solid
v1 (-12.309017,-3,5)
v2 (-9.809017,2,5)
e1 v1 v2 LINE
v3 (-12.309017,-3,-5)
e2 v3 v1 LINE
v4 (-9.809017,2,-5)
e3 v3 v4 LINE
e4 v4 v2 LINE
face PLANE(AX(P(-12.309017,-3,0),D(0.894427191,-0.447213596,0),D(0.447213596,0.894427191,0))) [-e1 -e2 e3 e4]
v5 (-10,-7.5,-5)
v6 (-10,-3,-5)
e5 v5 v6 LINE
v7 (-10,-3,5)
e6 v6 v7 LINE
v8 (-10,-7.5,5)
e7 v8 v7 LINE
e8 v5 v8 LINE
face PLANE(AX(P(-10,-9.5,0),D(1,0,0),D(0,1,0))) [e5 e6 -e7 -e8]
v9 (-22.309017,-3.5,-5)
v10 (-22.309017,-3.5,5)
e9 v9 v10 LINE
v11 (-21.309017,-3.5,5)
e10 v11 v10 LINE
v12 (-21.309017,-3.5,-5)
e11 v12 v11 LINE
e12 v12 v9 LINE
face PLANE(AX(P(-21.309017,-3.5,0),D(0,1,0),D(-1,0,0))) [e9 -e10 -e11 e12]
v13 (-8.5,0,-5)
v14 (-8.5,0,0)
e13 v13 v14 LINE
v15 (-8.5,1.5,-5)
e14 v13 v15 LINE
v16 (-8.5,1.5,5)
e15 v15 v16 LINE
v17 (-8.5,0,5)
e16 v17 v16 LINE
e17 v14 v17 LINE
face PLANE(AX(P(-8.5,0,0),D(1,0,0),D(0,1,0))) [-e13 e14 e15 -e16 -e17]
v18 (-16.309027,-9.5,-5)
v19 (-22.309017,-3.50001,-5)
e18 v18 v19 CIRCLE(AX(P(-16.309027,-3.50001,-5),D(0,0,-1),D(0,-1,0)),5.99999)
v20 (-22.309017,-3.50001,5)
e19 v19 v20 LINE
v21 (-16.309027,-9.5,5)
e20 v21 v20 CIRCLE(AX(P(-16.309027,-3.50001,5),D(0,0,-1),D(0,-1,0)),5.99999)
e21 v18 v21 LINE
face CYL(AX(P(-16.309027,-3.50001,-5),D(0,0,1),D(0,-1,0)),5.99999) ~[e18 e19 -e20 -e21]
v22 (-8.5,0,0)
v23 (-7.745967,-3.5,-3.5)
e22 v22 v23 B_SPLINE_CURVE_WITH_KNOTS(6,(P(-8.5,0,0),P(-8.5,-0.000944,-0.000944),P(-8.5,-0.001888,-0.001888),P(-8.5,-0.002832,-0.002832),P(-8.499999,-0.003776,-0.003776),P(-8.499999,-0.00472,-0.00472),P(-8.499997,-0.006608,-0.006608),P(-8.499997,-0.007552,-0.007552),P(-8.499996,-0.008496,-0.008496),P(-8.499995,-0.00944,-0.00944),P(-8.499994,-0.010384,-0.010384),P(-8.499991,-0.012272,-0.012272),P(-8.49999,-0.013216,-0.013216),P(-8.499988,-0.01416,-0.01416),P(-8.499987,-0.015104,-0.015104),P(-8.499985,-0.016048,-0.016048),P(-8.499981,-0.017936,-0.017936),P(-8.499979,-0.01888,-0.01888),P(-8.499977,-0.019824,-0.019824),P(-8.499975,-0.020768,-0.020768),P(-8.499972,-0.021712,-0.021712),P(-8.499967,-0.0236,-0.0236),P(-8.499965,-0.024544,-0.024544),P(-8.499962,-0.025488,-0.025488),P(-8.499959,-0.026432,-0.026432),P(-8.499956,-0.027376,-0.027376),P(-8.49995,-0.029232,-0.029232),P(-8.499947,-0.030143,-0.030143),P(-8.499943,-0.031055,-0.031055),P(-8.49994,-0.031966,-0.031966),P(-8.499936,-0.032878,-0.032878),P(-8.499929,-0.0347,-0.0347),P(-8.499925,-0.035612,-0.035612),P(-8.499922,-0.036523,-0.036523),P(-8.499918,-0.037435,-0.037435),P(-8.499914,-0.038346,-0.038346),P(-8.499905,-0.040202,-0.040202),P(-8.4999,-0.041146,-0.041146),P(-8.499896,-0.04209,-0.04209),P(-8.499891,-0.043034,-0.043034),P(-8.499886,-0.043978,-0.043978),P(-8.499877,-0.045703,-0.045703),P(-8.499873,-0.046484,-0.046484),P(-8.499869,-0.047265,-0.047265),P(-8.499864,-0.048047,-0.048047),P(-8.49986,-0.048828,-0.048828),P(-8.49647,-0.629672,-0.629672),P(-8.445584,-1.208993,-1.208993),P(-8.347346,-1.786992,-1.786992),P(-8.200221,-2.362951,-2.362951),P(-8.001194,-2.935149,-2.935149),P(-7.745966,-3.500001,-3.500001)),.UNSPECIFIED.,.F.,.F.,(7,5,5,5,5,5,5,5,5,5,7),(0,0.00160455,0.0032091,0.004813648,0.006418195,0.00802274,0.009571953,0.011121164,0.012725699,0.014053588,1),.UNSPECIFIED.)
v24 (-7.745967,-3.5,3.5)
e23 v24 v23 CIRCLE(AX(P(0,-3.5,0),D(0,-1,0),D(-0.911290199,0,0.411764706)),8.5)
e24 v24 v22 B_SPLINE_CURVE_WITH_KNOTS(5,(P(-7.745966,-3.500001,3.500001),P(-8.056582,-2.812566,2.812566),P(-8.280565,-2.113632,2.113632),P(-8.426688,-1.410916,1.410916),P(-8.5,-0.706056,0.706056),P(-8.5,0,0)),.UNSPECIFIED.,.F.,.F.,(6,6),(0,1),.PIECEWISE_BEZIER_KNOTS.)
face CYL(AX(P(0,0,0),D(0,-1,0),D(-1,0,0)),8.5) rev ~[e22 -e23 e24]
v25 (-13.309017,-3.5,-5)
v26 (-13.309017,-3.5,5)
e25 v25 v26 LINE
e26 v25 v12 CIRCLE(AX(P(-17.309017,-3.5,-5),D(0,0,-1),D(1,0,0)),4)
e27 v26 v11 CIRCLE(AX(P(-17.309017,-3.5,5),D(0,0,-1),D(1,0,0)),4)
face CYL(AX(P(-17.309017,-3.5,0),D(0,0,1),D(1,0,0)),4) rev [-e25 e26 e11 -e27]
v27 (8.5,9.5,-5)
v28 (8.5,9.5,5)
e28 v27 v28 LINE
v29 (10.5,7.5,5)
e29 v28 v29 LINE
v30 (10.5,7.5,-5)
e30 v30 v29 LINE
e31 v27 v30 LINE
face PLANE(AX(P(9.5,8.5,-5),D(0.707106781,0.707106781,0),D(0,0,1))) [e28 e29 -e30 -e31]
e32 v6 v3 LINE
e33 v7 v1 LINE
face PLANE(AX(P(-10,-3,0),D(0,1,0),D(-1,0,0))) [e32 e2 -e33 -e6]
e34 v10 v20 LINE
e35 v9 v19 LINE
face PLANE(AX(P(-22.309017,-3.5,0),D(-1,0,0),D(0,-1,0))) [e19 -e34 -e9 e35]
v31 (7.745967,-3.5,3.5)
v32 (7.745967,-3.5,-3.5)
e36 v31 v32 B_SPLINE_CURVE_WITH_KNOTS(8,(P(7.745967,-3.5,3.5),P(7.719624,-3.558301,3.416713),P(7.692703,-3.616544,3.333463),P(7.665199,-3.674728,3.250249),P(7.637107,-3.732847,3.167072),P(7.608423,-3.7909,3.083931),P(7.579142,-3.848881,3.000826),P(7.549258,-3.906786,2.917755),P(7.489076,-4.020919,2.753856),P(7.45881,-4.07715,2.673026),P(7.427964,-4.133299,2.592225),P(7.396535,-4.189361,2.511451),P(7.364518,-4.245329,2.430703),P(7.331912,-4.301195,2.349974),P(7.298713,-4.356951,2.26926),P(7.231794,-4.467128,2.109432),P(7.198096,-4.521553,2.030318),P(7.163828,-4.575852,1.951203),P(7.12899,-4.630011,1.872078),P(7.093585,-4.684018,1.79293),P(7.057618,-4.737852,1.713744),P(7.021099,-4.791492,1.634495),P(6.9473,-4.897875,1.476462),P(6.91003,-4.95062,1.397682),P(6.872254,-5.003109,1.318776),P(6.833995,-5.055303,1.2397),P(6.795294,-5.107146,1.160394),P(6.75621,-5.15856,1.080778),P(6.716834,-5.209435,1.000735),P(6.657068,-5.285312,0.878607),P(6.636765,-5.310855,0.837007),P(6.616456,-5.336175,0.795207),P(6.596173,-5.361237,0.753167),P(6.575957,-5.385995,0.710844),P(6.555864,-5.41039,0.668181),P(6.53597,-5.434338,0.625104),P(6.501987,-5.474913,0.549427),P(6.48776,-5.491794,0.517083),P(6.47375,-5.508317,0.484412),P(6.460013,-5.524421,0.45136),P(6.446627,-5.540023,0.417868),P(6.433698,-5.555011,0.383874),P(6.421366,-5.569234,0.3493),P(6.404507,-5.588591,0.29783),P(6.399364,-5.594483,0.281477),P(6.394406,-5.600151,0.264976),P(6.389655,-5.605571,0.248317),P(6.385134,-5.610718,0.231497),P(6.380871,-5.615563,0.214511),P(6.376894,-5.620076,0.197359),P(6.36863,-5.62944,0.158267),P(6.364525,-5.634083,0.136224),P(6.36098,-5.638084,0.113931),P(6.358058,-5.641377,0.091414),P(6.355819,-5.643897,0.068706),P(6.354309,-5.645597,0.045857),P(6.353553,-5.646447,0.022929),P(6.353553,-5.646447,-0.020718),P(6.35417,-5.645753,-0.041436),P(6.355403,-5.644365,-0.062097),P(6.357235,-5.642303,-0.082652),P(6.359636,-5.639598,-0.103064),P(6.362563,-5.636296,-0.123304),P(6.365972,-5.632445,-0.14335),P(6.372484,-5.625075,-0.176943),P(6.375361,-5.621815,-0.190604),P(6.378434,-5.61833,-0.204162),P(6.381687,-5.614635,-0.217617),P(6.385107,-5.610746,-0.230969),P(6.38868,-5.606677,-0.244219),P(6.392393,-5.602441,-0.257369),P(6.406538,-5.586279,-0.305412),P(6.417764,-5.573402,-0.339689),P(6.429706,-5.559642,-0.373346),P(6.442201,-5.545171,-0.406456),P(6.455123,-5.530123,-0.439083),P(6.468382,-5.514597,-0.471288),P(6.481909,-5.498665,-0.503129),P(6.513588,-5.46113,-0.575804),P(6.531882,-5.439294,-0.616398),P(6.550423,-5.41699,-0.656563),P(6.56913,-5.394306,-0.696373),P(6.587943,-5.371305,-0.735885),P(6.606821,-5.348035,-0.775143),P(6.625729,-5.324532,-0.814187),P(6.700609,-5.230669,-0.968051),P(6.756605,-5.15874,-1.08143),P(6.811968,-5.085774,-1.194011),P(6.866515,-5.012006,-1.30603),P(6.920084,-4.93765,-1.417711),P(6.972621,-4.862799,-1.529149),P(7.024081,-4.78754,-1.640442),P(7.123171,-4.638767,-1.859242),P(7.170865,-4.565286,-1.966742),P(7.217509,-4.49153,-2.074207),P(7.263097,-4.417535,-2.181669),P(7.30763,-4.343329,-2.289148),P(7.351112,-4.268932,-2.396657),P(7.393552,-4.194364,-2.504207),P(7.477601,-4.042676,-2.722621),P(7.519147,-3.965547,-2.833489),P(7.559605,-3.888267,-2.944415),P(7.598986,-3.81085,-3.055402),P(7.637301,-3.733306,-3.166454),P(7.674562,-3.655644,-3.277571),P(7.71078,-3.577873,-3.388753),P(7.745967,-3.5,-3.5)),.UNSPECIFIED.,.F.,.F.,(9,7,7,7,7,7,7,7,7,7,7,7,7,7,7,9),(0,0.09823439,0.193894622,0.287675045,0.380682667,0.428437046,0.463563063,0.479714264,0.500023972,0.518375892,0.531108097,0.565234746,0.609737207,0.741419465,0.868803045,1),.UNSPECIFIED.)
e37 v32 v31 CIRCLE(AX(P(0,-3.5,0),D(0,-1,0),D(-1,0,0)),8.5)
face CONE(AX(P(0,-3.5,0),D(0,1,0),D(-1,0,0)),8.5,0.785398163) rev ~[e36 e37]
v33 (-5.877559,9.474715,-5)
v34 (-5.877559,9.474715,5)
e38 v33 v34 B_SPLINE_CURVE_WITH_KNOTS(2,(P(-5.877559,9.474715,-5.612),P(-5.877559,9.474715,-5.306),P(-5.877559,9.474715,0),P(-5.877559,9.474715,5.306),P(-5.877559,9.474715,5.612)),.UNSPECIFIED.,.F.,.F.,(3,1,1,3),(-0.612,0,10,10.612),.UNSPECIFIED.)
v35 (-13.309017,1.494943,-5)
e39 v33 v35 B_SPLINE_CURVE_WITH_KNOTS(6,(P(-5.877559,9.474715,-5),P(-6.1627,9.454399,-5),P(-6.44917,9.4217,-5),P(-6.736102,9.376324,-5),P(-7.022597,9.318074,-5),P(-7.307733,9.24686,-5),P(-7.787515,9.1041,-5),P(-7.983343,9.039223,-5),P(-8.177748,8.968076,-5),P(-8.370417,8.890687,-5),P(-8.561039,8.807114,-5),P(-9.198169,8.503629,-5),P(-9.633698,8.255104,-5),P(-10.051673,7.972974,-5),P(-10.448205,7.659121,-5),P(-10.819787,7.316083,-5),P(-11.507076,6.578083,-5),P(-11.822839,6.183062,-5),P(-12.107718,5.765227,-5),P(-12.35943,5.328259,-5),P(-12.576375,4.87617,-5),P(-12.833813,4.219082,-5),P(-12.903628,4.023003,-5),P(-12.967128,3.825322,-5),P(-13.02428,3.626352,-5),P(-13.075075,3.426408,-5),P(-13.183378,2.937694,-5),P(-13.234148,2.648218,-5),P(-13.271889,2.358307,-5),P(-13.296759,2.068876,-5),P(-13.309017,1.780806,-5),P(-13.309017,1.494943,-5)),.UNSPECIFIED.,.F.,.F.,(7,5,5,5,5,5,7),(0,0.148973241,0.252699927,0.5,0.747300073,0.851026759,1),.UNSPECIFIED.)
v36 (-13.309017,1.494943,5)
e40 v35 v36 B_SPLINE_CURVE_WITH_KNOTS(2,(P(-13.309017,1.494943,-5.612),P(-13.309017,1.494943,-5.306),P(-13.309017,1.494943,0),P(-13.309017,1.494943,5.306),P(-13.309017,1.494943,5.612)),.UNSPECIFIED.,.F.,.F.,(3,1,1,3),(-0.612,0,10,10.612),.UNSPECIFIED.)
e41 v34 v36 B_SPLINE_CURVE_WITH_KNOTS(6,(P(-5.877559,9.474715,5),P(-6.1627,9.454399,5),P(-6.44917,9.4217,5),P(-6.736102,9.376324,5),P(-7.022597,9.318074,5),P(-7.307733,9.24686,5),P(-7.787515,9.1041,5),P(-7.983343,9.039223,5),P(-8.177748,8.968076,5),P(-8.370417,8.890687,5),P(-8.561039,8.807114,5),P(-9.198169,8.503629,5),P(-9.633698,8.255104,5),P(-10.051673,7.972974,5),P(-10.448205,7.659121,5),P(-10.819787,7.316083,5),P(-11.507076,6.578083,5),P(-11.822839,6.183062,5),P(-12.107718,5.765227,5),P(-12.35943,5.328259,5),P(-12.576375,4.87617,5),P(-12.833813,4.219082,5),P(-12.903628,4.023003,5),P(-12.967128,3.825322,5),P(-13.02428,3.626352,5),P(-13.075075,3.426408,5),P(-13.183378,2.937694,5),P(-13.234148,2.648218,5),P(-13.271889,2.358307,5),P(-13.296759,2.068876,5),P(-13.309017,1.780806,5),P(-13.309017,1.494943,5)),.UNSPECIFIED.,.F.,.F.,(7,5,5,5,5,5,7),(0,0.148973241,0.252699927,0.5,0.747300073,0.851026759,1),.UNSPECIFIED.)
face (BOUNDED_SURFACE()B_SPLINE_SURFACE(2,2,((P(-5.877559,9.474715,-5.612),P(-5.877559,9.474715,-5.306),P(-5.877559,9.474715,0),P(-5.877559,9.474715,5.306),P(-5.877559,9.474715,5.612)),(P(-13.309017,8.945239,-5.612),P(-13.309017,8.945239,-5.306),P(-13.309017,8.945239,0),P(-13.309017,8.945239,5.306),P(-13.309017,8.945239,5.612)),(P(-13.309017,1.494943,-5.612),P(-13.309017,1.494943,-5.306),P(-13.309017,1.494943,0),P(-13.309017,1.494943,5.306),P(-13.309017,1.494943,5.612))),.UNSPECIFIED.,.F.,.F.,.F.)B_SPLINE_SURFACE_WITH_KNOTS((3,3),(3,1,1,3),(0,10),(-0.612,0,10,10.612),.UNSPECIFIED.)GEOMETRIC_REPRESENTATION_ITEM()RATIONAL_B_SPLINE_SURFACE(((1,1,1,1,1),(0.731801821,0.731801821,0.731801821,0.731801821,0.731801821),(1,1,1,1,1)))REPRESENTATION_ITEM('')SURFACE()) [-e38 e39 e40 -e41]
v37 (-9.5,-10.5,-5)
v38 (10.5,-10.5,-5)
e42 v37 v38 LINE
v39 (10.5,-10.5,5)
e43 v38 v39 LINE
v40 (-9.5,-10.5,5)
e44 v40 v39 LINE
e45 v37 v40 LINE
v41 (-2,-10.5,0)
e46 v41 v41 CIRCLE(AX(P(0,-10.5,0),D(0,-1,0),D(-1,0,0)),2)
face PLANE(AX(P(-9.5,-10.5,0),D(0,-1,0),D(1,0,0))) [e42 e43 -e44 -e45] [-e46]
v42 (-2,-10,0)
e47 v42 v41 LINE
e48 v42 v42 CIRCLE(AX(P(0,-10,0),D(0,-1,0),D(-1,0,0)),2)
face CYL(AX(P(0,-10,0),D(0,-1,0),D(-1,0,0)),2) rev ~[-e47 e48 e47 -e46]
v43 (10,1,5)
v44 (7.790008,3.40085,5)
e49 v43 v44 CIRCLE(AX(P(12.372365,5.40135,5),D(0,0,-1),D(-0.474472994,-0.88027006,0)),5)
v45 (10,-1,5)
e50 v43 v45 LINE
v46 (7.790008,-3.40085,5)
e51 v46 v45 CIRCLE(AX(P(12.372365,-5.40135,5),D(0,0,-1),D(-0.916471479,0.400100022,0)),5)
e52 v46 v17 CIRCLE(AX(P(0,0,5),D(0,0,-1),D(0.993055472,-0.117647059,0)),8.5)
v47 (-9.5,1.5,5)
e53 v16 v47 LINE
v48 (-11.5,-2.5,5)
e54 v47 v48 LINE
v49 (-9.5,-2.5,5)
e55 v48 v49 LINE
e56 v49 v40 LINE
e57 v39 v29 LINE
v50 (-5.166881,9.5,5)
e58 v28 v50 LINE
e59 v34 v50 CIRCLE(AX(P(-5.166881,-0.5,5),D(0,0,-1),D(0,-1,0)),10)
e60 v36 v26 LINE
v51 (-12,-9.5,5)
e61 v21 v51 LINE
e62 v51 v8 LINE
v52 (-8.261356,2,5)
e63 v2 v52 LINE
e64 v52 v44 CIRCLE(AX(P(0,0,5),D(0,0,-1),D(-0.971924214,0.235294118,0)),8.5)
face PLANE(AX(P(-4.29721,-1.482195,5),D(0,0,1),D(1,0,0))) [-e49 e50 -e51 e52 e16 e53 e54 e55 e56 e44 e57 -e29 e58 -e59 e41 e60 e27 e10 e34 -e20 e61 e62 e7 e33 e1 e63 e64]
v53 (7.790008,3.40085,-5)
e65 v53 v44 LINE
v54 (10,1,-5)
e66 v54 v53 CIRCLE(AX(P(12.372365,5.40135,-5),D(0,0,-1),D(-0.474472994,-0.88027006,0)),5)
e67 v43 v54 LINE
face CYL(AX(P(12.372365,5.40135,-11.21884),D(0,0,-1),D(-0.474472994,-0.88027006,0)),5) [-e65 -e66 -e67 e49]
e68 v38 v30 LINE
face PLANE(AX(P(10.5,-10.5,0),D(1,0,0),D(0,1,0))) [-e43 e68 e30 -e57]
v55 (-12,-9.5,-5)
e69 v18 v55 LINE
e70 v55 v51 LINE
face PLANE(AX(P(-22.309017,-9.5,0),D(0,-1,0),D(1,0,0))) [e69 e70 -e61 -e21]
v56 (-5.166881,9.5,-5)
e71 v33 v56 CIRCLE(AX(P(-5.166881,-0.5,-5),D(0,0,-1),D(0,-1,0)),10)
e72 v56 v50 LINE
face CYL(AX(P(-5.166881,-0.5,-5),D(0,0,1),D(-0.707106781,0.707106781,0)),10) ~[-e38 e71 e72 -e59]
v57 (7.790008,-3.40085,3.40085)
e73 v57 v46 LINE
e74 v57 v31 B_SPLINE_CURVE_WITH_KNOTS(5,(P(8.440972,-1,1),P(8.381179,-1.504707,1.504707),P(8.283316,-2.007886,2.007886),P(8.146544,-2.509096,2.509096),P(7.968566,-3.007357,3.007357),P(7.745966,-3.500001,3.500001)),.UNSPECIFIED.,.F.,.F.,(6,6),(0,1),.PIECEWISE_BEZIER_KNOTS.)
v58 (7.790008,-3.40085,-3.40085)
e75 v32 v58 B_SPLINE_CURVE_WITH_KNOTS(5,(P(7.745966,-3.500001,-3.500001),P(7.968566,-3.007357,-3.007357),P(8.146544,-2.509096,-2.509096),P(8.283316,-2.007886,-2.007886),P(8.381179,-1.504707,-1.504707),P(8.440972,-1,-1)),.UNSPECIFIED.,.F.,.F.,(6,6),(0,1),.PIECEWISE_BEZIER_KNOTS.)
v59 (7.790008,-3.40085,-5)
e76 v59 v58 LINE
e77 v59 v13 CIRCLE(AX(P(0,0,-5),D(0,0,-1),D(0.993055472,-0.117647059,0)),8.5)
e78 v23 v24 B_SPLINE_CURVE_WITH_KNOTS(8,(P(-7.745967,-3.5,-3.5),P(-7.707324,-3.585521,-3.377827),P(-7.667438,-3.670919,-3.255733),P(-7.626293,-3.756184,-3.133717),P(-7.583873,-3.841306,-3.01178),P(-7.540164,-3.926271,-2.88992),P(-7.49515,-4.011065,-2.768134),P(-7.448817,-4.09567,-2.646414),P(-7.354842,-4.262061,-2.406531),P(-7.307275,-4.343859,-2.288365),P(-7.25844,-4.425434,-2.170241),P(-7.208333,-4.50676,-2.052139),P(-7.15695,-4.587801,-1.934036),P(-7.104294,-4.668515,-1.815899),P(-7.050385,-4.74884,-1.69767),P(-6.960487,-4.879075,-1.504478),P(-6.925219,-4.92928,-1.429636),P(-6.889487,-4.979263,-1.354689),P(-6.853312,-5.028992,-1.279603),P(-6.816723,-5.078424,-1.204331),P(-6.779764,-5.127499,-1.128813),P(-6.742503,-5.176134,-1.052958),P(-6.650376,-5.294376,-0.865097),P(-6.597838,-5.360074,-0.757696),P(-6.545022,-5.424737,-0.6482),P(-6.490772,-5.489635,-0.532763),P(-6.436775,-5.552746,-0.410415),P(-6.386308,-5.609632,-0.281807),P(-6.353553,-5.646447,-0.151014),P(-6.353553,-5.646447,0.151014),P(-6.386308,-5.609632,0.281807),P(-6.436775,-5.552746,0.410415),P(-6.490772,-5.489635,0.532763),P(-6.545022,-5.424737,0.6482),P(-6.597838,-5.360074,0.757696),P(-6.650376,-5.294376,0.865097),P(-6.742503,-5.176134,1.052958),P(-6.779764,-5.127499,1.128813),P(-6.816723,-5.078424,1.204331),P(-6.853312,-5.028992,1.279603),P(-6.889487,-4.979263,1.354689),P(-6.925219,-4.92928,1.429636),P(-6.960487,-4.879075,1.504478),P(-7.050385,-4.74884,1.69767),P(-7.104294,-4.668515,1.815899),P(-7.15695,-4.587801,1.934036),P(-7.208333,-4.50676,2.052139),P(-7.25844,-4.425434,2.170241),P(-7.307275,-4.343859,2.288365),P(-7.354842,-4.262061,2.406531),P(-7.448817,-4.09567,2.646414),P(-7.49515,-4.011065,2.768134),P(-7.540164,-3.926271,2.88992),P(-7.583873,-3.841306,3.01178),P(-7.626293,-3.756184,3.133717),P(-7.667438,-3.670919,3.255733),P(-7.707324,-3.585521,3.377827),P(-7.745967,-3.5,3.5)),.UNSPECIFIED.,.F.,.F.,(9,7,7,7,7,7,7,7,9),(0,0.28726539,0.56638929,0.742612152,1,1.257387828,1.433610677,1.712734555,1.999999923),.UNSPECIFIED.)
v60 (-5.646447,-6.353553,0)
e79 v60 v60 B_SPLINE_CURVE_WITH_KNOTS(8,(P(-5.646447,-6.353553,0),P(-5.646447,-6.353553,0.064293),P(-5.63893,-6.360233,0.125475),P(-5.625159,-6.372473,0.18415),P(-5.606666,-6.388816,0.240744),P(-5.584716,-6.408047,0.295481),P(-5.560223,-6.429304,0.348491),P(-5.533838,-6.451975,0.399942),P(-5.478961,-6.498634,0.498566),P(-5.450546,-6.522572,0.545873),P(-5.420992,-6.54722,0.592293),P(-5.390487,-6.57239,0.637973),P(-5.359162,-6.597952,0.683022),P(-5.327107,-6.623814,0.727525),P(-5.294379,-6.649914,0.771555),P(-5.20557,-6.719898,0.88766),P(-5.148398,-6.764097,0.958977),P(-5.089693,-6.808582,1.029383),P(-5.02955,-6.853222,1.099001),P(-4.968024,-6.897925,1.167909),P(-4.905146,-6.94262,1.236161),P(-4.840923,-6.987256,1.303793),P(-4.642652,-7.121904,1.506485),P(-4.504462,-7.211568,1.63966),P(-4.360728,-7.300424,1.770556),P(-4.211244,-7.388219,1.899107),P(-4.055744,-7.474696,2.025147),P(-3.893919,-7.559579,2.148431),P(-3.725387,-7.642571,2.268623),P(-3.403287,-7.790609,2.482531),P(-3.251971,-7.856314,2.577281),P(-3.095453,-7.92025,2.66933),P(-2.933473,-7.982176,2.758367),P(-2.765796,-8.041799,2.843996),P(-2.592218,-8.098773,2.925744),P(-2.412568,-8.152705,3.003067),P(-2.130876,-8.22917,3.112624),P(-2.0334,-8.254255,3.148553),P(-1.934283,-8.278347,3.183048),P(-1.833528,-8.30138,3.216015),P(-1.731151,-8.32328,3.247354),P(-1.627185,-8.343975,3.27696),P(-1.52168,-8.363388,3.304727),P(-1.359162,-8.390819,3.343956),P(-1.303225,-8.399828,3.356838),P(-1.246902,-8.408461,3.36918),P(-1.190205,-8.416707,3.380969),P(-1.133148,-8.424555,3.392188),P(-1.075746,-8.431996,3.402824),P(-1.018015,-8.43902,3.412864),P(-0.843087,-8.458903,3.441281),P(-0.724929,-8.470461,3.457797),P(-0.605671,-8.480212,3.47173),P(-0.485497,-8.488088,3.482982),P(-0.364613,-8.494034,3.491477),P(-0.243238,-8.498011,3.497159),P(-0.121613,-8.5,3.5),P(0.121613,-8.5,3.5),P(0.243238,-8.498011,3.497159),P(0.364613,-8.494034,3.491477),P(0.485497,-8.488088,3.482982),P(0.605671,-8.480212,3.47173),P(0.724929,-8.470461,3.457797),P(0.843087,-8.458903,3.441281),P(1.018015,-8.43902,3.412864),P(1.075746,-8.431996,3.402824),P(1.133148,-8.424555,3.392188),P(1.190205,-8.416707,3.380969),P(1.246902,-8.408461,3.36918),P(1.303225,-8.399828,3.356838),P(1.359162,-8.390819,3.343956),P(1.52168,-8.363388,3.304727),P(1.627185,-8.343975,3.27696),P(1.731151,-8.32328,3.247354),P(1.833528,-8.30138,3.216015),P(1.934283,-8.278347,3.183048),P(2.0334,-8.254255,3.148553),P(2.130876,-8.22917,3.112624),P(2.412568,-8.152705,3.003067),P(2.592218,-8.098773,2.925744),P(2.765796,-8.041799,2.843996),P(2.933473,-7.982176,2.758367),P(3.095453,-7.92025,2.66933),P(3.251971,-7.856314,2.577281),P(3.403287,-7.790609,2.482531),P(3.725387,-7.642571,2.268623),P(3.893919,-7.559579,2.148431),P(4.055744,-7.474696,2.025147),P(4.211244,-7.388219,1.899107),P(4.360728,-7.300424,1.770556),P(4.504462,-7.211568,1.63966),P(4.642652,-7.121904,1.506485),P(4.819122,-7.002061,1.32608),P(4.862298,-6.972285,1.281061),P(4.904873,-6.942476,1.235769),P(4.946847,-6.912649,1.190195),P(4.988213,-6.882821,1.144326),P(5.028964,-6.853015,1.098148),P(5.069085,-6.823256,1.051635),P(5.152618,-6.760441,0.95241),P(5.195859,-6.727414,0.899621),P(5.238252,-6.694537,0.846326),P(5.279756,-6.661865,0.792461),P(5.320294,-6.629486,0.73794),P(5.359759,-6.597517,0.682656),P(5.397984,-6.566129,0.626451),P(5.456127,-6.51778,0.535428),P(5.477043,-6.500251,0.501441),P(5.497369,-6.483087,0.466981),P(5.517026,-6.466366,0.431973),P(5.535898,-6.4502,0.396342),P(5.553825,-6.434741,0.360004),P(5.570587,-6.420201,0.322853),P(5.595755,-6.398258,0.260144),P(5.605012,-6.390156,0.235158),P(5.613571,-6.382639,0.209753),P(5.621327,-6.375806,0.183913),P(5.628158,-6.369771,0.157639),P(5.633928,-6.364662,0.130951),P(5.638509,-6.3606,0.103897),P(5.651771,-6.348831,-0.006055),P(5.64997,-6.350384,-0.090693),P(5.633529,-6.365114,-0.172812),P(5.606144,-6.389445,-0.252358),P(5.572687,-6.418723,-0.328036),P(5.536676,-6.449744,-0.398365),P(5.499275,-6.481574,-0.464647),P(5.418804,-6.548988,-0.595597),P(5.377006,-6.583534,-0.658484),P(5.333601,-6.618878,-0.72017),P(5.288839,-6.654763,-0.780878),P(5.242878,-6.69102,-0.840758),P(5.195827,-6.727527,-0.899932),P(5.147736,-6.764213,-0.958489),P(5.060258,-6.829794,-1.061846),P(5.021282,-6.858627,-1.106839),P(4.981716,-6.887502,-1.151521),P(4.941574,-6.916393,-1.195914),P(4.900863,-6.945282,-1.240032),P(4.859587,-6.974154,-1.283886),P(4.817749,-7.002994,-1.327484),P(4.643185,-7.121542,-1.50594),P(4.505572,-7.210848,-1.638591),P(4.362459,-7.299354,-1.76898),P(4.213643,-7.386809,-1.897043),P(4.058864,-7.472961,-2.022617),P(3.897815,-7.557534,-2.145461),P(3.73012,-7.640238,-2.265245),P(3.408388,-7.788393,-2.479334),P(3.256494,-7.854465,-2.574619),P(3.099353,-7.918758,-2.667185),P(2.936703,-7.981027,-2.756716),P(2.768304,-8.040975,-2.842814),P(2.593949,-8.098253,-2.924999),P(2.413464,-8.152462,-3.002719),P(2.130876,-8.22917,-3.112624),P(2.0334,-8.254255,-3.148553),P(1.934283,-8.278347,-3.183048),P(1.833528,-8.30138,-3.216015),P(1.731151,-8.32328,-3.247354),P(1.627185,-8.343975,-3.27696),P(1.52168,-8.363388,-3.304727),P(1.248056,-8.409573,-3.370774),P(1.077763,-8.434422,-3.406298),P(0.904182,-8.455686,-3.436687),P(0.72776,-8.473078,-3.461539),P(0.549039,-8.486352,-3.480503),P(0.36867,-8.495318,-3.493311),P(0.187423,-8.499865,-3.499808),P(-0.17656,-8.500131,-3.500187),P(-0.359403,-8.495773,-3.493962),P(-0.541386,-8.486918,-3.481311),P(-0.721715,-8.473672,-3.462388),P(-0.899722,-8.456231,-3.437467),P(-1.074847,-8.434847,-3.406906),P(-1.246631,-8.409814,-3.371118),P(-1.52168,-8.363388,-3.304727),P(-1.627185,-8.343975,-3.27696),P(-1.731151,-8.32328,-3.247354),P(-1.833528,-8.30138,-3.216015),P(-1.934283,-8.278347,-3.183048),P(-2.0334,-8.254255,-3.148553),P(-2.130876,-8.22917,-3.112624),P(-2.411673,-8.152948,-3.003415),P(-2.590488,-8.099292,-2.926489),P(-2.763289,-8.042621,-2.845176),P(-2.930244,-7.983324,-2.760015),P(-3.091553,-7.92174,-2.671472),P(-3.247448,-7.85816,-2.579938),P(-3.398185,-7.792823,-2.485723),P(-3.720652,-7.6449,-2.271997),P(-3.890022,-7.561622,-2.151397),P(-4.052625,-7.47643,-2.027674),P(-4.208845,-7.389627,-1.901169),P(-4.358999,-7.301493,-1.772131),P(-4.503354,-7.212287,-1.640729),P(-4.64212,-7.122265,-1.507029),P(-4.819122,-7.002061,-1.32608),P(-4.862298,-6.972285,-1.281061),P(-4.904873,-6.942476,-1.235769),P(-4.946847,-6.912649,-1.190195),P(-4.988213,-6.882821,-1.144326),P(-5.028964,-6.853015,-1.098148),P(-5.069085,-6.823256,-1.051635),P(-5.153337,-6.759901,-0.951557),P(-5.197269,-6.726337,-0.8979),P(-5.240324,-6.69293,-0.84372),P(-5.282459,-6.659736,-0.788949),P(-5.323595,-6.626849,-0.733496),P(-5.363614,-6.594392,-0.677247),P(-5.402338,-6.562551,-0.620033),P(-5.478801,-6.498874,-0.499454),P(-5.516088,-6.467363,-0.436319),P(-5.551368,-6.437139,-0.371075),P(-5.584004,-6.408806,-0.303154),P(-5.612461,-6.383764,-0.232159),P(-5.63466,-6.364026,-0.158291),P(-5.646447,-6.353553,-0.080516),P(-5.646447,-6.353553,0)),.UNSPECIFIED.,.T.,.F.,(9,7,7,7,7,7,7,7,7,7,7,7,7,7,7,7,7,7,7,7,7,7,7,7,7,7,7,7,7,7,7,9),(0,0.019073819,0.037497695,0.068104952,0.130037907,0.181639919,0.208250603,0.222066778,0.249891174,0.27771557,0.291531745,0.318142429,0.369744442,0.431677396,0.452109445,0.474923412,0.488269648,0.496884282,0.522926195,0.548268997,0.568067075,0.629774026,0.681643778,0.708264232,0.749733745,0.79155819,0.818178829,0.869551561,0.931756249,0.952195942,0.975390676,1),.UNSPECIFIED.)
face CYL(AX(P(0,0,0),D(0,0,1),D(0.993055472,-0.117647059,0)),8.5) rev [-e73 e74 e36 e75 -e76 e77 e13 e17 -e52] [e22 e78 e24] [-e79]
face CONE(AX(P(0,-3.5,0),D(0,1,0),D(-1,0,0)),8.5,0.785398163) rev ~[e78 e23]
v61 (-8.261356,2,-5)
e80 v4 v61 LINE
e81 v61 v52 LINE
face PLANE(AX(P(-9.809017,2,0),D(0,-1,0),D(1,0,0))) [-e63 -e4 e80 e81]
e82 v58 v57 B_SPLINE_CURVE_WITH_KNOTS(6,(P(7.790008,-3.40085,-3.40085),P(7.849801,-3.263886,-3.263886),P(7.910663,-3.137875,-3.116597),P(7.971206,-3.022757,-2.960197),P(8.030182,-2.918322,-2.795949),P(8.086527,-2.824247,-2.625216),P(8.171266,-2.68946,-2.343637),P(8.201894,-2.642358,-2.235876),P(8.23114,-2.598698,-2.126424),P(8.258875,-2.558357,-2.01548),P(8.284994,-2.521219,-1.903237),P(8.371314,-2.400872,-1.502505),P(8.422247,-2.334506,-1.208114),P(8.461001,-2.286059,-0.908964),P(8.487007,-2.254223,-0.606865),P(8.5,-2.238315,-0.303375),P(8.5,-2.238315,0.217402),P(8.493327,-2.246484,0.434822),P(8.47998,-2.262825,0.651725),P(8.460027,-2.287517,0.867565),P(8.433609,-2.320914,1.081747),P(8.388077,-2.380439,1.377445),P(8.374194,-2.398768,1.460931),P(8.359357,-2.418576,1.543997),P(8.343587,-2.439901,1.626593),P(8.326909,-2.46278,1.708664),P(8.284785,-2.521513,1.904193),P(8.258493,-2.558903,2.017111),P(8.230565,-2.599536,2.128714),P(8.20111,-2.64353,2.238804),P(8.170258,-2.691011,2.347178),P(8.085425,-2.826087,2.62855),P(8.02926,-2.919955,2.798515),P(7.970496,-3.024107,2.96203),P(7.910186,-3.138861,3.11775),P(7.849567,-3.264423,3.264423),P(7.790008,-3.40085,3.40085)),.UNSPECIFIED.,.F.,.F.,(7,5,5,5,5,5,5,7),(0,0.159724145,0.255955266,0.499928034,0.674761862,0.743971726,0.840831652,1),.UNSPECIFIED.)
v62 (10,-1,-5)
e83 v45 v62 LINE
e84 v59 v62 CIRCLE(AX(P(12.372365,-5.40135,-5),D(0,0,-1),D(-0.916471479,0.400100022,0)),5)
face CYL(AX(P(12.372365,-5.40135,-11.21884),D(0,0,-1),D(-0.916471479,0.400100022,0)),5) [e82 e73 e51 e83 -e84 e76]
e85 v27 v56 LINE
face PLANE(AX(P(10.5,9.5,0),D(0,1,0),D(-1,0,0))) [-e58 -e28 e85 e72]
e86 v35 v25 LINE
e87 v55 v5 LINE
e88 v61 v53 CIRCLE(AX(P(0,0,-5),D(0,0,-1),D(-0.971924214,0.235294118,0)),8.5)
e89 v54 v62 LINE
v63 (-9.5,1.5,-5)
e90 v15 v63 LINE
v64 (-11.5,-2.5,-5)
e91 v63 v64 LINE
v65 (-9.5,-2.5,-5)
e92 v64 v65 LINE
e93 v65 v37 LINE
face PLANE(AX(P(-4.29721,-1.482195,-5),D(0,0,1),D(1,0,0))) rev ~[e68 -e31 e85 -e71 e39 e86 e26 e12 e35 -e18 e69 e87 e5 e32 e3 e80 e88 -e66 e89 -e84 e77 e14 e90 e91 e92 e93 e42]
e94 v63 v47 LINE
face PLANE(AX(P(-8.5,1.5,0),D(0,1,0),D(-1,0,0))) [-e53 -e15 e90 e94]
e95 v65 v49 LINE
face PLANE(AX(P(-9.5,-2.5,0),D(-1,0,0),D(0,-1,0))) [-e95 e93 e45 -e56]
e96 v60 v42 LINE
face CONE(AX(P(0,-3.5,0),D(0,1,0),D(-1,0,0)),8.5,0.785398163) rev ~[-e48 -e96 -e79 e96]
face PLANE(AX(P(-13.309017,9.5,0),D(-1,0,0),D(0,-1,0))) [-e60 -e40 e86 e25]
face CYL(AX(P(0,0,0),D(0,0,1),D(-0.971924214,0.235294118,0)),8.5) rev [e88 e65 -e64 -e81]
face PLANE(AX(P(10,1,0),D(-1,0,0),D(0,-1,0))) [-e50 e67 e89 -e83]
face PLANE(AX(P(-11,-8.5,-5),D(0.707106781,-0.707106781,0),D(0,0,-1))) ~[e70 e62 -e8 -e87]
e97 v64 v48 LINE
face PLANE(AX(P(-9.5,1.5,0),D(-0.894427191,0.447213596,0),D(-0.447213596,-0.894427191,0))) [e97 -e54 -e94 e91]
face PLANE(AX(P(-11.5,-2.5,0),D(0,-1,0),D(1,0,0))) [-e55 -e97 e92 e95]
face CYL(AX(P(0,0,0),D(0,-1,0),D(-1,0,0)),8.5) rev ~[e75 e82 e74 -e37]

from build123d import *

# Parameters (mm, degrees)
F1_DEPTH    = 5
F4_SIZE     = 2
F5_R        = 5.99999
F6_SIZE     = 4
F7_R        = 10
F8_R        = 8
F9_T1_DEPTH = 22.4376803184
F9_T3_DEPTH = 16.4376803184
F9_T5_DEPTH = 16.4376803184
F10_SIZE    = 2


# Not quite as in the source:
# - a fillet or chamfer that OpenCascade refuses, or shapes differently, is made with other operations: its cross-section is extruded or revolved along the edge and cut away or added
# - a fillet or chamfer is up to 0.001 mm smaller than in the source, because OpenCascade refuses the exact size


with BuildPart() as f1:
    # F0 (on Top) → F1 (new body, symmetric)
    with BuildSketch(Plane.XY):
        with BuildLine():
            ThreePointArc((8.4409715081, -1), (-0.5008703332, -8.4852300446), (-8.5, 0))
            Line((-8.5, 0), (-8.5, 1.5))
            Line((-8.5, 1.5), (-9.5, 1.5))
            Line((-9.5, 1.5), (-11.5, -2.5))
            Line((-11.5, -2.5), (-9.5, -2.5))
            Line((-9.5, -2.5), (-9.5, -10.5))
            Line((-9.5, -10.5), (10.5, -10.5))
            Line((10.5, -10.5), (10.5, 9.5))
            Line((10.5, 9.5), (-13.3090169944, 9.5))
            Line((-13.3090169944, 9.5), (-13.3090169944, -3.5))
            ThreePointArc((-13.3090169944, -3.5), (-17.3090169944, -7.5), (-21.3090169944, -3.5))
            Line((-21.3090169944, -3.5), (-22.3090169944, -3.5))
            Line((-22.3090169944, -3.5), (-22.3090169944, -9.5))
            Line((-22.3090169944, -9.5), (-13.3090169944, -9.5))
            Line((-13.3090169944, -9.5), (-10, -9.5))
            Line((-10, -9.5), (-10, -3))
            Line((-10, -3), (-12.3090169944, -3))
            Line((-12.3090169944, -3), (-9.8090169944, 2))
            Line((-9.8090169944, 2), (-8.2613558209, 2))
            ThreePointArc((-8.2613558209, 2), (0.5080014259, 8.4848060998), (8.4409715081, 1))
            Line((8.4409715081, 1), (10, 1))
            Line((10, 1), (10, -1))
            Line((10, -1), (8.4409715081, -1))
        make_face()
    extrude(amount=F1_DEPTH, both=True)

    # F2 (on Top) → F3 (revolve, cut)
    with BuildSketch(Plane.XY):
        Polygon((0, 0), (-8.5, 0), (-8.5, -3.5), (-2, -10), (-2, -10.5), (0, -10.5), align=None)
    revolve(axis=Axis((0, -4.5, 0), (0, -1, 0)), mode=Mode.SUBTRACT)

    # F4
    f4_edges = [f1.edges().sort_by_distance(p)[0] for p in [
        (-10, -9.5, 0),
    ]]
    chamfer(f4_edges, length=F4_SIZE)

    # F5 (radius 6 in the source; OpenCascade refuses exactly that, so slightly less here)
    f5_edges = [f1.edges().sort_by_distance(p)[0] for p in [
        (-22.309017, -9.5, 0),
    ]]
    fillet(f5_edges, radius=F5_R)

    # F6
    f6_edges = [f1.edges().sort_by_distance(p)[0] for p in [
        (-13.309017, 9.5, 0),
    ]]
    chamfer(f6_edges, length=F6_SIZE)

    # F7
    f7_edges = [f1.edges().sort_by_distance(p)[0] for p in [
        (-9.309017, 9.5, 0),
    ]]
    fillet(f7_edges, radius=F7_R)

    # F8
    f8_edges = [f1.edges().sort_by_distance(p)[0] for p in [
        (-13.309017, 5.5, 0),
    ]]
    fillet(f8_edges, radius=F8_R)

    # F9: fillet of radius 5 on 3 edges, made by hand

    # F9_s2 → F9_t1 (cut)
    with BuildSketch(Plane.XY.offset(-11.2188401592)):
        with BuildLine():
            ThreePointArc((10, 1), (8.693634047, 2.015063424), (7.7900075738, 3.4008501878))
            Line((7.7900075738, 3.4008501878), (7.6983604259, 3.3608401856))
            ThreePointArc((7.6983604259, 3.3608401856), (8.1072760601, 2.1981980996), (8.3416659609, 0.9882352941))
            Line((8.3416659609, 0.9882352941), (8.4409715081, 0.9))
            ThreePointArc((8.4409715081, 0.9), (9.220485754, 0.9), (9.9525527006, 0.911972994))
            Line((9.9525527006, 0.911972994), (10, 1))
        make_face()
    extrude(amount=F9_T1_DEPTH, mode=Mode.SUBTRACT)

    # F9_s4 → F9_t3 (cut)
    with BuildSketch(Plane.XY.offset(-11.2188401592)):
        with BuildLine():
            ThreePointArc((7.7900075738, -3.4008501878), (8.693634047, -2.015063424), (10, -1))
            Line((10, -1), (9.9525527006, -0.911972994))
            ThreePointArc((9.9525527006, -0.911972994), (9.220485754, -0.9), (8.4409715081, -0.9))
            Line((8.4409715081, -0.9), (8.3416659609, -0.9882352941))
            ThreePointArc((8.3416659609, -0.9882352941), (8.1072760601, -2.1981980996), (7.6983604259, -3.3608401856))
            Line((7.6983604259, -3.3608401856), (7.7900075738, -3.4008501878))
        make_face()
    extrude(amount=F9_T3_DEPTH, mode=Mode.SUBTRACT)

    # F9_s6 → F9_t5 (cut)
    with BuildSketch(Plane.XY.offset(-5.2188401592)):
        with BuildLine():
            ThreePointArc((7.7900075738, -3.4008501878), (8.693634047, -2.015063424), (10, -1))
            Line((10, -1), (9.9525527006, -0.911972994))
            ThreePointArc((9.9525527006, -0.911972994), (9.220485754, -0.9), (8.4409715081, -0.9))
            Line((8.4409715081, -0.9), (8.3416659609, -0.9882352941))
            ThreePointArc((8.3416659609, -0.9882352941), (8.1072760601, -2.1981980996), (7.6983604259, -3.3608401856))
            Line((7.6983604259, -3.3608401856), (7.7900075738, -3.4008501878))
        make_face()
    extrude(amount=F9_T5_DEPTH, mode=Mode.SUBTRACT)

    # F10
    f10_edges = [f1.edges().sort_by_distance(p)[0] for p in [
        (10.5, 9.5, 0),
    ]]
    chamfer(f10_edges, length=F10_SIZE)


solid = f1.part
